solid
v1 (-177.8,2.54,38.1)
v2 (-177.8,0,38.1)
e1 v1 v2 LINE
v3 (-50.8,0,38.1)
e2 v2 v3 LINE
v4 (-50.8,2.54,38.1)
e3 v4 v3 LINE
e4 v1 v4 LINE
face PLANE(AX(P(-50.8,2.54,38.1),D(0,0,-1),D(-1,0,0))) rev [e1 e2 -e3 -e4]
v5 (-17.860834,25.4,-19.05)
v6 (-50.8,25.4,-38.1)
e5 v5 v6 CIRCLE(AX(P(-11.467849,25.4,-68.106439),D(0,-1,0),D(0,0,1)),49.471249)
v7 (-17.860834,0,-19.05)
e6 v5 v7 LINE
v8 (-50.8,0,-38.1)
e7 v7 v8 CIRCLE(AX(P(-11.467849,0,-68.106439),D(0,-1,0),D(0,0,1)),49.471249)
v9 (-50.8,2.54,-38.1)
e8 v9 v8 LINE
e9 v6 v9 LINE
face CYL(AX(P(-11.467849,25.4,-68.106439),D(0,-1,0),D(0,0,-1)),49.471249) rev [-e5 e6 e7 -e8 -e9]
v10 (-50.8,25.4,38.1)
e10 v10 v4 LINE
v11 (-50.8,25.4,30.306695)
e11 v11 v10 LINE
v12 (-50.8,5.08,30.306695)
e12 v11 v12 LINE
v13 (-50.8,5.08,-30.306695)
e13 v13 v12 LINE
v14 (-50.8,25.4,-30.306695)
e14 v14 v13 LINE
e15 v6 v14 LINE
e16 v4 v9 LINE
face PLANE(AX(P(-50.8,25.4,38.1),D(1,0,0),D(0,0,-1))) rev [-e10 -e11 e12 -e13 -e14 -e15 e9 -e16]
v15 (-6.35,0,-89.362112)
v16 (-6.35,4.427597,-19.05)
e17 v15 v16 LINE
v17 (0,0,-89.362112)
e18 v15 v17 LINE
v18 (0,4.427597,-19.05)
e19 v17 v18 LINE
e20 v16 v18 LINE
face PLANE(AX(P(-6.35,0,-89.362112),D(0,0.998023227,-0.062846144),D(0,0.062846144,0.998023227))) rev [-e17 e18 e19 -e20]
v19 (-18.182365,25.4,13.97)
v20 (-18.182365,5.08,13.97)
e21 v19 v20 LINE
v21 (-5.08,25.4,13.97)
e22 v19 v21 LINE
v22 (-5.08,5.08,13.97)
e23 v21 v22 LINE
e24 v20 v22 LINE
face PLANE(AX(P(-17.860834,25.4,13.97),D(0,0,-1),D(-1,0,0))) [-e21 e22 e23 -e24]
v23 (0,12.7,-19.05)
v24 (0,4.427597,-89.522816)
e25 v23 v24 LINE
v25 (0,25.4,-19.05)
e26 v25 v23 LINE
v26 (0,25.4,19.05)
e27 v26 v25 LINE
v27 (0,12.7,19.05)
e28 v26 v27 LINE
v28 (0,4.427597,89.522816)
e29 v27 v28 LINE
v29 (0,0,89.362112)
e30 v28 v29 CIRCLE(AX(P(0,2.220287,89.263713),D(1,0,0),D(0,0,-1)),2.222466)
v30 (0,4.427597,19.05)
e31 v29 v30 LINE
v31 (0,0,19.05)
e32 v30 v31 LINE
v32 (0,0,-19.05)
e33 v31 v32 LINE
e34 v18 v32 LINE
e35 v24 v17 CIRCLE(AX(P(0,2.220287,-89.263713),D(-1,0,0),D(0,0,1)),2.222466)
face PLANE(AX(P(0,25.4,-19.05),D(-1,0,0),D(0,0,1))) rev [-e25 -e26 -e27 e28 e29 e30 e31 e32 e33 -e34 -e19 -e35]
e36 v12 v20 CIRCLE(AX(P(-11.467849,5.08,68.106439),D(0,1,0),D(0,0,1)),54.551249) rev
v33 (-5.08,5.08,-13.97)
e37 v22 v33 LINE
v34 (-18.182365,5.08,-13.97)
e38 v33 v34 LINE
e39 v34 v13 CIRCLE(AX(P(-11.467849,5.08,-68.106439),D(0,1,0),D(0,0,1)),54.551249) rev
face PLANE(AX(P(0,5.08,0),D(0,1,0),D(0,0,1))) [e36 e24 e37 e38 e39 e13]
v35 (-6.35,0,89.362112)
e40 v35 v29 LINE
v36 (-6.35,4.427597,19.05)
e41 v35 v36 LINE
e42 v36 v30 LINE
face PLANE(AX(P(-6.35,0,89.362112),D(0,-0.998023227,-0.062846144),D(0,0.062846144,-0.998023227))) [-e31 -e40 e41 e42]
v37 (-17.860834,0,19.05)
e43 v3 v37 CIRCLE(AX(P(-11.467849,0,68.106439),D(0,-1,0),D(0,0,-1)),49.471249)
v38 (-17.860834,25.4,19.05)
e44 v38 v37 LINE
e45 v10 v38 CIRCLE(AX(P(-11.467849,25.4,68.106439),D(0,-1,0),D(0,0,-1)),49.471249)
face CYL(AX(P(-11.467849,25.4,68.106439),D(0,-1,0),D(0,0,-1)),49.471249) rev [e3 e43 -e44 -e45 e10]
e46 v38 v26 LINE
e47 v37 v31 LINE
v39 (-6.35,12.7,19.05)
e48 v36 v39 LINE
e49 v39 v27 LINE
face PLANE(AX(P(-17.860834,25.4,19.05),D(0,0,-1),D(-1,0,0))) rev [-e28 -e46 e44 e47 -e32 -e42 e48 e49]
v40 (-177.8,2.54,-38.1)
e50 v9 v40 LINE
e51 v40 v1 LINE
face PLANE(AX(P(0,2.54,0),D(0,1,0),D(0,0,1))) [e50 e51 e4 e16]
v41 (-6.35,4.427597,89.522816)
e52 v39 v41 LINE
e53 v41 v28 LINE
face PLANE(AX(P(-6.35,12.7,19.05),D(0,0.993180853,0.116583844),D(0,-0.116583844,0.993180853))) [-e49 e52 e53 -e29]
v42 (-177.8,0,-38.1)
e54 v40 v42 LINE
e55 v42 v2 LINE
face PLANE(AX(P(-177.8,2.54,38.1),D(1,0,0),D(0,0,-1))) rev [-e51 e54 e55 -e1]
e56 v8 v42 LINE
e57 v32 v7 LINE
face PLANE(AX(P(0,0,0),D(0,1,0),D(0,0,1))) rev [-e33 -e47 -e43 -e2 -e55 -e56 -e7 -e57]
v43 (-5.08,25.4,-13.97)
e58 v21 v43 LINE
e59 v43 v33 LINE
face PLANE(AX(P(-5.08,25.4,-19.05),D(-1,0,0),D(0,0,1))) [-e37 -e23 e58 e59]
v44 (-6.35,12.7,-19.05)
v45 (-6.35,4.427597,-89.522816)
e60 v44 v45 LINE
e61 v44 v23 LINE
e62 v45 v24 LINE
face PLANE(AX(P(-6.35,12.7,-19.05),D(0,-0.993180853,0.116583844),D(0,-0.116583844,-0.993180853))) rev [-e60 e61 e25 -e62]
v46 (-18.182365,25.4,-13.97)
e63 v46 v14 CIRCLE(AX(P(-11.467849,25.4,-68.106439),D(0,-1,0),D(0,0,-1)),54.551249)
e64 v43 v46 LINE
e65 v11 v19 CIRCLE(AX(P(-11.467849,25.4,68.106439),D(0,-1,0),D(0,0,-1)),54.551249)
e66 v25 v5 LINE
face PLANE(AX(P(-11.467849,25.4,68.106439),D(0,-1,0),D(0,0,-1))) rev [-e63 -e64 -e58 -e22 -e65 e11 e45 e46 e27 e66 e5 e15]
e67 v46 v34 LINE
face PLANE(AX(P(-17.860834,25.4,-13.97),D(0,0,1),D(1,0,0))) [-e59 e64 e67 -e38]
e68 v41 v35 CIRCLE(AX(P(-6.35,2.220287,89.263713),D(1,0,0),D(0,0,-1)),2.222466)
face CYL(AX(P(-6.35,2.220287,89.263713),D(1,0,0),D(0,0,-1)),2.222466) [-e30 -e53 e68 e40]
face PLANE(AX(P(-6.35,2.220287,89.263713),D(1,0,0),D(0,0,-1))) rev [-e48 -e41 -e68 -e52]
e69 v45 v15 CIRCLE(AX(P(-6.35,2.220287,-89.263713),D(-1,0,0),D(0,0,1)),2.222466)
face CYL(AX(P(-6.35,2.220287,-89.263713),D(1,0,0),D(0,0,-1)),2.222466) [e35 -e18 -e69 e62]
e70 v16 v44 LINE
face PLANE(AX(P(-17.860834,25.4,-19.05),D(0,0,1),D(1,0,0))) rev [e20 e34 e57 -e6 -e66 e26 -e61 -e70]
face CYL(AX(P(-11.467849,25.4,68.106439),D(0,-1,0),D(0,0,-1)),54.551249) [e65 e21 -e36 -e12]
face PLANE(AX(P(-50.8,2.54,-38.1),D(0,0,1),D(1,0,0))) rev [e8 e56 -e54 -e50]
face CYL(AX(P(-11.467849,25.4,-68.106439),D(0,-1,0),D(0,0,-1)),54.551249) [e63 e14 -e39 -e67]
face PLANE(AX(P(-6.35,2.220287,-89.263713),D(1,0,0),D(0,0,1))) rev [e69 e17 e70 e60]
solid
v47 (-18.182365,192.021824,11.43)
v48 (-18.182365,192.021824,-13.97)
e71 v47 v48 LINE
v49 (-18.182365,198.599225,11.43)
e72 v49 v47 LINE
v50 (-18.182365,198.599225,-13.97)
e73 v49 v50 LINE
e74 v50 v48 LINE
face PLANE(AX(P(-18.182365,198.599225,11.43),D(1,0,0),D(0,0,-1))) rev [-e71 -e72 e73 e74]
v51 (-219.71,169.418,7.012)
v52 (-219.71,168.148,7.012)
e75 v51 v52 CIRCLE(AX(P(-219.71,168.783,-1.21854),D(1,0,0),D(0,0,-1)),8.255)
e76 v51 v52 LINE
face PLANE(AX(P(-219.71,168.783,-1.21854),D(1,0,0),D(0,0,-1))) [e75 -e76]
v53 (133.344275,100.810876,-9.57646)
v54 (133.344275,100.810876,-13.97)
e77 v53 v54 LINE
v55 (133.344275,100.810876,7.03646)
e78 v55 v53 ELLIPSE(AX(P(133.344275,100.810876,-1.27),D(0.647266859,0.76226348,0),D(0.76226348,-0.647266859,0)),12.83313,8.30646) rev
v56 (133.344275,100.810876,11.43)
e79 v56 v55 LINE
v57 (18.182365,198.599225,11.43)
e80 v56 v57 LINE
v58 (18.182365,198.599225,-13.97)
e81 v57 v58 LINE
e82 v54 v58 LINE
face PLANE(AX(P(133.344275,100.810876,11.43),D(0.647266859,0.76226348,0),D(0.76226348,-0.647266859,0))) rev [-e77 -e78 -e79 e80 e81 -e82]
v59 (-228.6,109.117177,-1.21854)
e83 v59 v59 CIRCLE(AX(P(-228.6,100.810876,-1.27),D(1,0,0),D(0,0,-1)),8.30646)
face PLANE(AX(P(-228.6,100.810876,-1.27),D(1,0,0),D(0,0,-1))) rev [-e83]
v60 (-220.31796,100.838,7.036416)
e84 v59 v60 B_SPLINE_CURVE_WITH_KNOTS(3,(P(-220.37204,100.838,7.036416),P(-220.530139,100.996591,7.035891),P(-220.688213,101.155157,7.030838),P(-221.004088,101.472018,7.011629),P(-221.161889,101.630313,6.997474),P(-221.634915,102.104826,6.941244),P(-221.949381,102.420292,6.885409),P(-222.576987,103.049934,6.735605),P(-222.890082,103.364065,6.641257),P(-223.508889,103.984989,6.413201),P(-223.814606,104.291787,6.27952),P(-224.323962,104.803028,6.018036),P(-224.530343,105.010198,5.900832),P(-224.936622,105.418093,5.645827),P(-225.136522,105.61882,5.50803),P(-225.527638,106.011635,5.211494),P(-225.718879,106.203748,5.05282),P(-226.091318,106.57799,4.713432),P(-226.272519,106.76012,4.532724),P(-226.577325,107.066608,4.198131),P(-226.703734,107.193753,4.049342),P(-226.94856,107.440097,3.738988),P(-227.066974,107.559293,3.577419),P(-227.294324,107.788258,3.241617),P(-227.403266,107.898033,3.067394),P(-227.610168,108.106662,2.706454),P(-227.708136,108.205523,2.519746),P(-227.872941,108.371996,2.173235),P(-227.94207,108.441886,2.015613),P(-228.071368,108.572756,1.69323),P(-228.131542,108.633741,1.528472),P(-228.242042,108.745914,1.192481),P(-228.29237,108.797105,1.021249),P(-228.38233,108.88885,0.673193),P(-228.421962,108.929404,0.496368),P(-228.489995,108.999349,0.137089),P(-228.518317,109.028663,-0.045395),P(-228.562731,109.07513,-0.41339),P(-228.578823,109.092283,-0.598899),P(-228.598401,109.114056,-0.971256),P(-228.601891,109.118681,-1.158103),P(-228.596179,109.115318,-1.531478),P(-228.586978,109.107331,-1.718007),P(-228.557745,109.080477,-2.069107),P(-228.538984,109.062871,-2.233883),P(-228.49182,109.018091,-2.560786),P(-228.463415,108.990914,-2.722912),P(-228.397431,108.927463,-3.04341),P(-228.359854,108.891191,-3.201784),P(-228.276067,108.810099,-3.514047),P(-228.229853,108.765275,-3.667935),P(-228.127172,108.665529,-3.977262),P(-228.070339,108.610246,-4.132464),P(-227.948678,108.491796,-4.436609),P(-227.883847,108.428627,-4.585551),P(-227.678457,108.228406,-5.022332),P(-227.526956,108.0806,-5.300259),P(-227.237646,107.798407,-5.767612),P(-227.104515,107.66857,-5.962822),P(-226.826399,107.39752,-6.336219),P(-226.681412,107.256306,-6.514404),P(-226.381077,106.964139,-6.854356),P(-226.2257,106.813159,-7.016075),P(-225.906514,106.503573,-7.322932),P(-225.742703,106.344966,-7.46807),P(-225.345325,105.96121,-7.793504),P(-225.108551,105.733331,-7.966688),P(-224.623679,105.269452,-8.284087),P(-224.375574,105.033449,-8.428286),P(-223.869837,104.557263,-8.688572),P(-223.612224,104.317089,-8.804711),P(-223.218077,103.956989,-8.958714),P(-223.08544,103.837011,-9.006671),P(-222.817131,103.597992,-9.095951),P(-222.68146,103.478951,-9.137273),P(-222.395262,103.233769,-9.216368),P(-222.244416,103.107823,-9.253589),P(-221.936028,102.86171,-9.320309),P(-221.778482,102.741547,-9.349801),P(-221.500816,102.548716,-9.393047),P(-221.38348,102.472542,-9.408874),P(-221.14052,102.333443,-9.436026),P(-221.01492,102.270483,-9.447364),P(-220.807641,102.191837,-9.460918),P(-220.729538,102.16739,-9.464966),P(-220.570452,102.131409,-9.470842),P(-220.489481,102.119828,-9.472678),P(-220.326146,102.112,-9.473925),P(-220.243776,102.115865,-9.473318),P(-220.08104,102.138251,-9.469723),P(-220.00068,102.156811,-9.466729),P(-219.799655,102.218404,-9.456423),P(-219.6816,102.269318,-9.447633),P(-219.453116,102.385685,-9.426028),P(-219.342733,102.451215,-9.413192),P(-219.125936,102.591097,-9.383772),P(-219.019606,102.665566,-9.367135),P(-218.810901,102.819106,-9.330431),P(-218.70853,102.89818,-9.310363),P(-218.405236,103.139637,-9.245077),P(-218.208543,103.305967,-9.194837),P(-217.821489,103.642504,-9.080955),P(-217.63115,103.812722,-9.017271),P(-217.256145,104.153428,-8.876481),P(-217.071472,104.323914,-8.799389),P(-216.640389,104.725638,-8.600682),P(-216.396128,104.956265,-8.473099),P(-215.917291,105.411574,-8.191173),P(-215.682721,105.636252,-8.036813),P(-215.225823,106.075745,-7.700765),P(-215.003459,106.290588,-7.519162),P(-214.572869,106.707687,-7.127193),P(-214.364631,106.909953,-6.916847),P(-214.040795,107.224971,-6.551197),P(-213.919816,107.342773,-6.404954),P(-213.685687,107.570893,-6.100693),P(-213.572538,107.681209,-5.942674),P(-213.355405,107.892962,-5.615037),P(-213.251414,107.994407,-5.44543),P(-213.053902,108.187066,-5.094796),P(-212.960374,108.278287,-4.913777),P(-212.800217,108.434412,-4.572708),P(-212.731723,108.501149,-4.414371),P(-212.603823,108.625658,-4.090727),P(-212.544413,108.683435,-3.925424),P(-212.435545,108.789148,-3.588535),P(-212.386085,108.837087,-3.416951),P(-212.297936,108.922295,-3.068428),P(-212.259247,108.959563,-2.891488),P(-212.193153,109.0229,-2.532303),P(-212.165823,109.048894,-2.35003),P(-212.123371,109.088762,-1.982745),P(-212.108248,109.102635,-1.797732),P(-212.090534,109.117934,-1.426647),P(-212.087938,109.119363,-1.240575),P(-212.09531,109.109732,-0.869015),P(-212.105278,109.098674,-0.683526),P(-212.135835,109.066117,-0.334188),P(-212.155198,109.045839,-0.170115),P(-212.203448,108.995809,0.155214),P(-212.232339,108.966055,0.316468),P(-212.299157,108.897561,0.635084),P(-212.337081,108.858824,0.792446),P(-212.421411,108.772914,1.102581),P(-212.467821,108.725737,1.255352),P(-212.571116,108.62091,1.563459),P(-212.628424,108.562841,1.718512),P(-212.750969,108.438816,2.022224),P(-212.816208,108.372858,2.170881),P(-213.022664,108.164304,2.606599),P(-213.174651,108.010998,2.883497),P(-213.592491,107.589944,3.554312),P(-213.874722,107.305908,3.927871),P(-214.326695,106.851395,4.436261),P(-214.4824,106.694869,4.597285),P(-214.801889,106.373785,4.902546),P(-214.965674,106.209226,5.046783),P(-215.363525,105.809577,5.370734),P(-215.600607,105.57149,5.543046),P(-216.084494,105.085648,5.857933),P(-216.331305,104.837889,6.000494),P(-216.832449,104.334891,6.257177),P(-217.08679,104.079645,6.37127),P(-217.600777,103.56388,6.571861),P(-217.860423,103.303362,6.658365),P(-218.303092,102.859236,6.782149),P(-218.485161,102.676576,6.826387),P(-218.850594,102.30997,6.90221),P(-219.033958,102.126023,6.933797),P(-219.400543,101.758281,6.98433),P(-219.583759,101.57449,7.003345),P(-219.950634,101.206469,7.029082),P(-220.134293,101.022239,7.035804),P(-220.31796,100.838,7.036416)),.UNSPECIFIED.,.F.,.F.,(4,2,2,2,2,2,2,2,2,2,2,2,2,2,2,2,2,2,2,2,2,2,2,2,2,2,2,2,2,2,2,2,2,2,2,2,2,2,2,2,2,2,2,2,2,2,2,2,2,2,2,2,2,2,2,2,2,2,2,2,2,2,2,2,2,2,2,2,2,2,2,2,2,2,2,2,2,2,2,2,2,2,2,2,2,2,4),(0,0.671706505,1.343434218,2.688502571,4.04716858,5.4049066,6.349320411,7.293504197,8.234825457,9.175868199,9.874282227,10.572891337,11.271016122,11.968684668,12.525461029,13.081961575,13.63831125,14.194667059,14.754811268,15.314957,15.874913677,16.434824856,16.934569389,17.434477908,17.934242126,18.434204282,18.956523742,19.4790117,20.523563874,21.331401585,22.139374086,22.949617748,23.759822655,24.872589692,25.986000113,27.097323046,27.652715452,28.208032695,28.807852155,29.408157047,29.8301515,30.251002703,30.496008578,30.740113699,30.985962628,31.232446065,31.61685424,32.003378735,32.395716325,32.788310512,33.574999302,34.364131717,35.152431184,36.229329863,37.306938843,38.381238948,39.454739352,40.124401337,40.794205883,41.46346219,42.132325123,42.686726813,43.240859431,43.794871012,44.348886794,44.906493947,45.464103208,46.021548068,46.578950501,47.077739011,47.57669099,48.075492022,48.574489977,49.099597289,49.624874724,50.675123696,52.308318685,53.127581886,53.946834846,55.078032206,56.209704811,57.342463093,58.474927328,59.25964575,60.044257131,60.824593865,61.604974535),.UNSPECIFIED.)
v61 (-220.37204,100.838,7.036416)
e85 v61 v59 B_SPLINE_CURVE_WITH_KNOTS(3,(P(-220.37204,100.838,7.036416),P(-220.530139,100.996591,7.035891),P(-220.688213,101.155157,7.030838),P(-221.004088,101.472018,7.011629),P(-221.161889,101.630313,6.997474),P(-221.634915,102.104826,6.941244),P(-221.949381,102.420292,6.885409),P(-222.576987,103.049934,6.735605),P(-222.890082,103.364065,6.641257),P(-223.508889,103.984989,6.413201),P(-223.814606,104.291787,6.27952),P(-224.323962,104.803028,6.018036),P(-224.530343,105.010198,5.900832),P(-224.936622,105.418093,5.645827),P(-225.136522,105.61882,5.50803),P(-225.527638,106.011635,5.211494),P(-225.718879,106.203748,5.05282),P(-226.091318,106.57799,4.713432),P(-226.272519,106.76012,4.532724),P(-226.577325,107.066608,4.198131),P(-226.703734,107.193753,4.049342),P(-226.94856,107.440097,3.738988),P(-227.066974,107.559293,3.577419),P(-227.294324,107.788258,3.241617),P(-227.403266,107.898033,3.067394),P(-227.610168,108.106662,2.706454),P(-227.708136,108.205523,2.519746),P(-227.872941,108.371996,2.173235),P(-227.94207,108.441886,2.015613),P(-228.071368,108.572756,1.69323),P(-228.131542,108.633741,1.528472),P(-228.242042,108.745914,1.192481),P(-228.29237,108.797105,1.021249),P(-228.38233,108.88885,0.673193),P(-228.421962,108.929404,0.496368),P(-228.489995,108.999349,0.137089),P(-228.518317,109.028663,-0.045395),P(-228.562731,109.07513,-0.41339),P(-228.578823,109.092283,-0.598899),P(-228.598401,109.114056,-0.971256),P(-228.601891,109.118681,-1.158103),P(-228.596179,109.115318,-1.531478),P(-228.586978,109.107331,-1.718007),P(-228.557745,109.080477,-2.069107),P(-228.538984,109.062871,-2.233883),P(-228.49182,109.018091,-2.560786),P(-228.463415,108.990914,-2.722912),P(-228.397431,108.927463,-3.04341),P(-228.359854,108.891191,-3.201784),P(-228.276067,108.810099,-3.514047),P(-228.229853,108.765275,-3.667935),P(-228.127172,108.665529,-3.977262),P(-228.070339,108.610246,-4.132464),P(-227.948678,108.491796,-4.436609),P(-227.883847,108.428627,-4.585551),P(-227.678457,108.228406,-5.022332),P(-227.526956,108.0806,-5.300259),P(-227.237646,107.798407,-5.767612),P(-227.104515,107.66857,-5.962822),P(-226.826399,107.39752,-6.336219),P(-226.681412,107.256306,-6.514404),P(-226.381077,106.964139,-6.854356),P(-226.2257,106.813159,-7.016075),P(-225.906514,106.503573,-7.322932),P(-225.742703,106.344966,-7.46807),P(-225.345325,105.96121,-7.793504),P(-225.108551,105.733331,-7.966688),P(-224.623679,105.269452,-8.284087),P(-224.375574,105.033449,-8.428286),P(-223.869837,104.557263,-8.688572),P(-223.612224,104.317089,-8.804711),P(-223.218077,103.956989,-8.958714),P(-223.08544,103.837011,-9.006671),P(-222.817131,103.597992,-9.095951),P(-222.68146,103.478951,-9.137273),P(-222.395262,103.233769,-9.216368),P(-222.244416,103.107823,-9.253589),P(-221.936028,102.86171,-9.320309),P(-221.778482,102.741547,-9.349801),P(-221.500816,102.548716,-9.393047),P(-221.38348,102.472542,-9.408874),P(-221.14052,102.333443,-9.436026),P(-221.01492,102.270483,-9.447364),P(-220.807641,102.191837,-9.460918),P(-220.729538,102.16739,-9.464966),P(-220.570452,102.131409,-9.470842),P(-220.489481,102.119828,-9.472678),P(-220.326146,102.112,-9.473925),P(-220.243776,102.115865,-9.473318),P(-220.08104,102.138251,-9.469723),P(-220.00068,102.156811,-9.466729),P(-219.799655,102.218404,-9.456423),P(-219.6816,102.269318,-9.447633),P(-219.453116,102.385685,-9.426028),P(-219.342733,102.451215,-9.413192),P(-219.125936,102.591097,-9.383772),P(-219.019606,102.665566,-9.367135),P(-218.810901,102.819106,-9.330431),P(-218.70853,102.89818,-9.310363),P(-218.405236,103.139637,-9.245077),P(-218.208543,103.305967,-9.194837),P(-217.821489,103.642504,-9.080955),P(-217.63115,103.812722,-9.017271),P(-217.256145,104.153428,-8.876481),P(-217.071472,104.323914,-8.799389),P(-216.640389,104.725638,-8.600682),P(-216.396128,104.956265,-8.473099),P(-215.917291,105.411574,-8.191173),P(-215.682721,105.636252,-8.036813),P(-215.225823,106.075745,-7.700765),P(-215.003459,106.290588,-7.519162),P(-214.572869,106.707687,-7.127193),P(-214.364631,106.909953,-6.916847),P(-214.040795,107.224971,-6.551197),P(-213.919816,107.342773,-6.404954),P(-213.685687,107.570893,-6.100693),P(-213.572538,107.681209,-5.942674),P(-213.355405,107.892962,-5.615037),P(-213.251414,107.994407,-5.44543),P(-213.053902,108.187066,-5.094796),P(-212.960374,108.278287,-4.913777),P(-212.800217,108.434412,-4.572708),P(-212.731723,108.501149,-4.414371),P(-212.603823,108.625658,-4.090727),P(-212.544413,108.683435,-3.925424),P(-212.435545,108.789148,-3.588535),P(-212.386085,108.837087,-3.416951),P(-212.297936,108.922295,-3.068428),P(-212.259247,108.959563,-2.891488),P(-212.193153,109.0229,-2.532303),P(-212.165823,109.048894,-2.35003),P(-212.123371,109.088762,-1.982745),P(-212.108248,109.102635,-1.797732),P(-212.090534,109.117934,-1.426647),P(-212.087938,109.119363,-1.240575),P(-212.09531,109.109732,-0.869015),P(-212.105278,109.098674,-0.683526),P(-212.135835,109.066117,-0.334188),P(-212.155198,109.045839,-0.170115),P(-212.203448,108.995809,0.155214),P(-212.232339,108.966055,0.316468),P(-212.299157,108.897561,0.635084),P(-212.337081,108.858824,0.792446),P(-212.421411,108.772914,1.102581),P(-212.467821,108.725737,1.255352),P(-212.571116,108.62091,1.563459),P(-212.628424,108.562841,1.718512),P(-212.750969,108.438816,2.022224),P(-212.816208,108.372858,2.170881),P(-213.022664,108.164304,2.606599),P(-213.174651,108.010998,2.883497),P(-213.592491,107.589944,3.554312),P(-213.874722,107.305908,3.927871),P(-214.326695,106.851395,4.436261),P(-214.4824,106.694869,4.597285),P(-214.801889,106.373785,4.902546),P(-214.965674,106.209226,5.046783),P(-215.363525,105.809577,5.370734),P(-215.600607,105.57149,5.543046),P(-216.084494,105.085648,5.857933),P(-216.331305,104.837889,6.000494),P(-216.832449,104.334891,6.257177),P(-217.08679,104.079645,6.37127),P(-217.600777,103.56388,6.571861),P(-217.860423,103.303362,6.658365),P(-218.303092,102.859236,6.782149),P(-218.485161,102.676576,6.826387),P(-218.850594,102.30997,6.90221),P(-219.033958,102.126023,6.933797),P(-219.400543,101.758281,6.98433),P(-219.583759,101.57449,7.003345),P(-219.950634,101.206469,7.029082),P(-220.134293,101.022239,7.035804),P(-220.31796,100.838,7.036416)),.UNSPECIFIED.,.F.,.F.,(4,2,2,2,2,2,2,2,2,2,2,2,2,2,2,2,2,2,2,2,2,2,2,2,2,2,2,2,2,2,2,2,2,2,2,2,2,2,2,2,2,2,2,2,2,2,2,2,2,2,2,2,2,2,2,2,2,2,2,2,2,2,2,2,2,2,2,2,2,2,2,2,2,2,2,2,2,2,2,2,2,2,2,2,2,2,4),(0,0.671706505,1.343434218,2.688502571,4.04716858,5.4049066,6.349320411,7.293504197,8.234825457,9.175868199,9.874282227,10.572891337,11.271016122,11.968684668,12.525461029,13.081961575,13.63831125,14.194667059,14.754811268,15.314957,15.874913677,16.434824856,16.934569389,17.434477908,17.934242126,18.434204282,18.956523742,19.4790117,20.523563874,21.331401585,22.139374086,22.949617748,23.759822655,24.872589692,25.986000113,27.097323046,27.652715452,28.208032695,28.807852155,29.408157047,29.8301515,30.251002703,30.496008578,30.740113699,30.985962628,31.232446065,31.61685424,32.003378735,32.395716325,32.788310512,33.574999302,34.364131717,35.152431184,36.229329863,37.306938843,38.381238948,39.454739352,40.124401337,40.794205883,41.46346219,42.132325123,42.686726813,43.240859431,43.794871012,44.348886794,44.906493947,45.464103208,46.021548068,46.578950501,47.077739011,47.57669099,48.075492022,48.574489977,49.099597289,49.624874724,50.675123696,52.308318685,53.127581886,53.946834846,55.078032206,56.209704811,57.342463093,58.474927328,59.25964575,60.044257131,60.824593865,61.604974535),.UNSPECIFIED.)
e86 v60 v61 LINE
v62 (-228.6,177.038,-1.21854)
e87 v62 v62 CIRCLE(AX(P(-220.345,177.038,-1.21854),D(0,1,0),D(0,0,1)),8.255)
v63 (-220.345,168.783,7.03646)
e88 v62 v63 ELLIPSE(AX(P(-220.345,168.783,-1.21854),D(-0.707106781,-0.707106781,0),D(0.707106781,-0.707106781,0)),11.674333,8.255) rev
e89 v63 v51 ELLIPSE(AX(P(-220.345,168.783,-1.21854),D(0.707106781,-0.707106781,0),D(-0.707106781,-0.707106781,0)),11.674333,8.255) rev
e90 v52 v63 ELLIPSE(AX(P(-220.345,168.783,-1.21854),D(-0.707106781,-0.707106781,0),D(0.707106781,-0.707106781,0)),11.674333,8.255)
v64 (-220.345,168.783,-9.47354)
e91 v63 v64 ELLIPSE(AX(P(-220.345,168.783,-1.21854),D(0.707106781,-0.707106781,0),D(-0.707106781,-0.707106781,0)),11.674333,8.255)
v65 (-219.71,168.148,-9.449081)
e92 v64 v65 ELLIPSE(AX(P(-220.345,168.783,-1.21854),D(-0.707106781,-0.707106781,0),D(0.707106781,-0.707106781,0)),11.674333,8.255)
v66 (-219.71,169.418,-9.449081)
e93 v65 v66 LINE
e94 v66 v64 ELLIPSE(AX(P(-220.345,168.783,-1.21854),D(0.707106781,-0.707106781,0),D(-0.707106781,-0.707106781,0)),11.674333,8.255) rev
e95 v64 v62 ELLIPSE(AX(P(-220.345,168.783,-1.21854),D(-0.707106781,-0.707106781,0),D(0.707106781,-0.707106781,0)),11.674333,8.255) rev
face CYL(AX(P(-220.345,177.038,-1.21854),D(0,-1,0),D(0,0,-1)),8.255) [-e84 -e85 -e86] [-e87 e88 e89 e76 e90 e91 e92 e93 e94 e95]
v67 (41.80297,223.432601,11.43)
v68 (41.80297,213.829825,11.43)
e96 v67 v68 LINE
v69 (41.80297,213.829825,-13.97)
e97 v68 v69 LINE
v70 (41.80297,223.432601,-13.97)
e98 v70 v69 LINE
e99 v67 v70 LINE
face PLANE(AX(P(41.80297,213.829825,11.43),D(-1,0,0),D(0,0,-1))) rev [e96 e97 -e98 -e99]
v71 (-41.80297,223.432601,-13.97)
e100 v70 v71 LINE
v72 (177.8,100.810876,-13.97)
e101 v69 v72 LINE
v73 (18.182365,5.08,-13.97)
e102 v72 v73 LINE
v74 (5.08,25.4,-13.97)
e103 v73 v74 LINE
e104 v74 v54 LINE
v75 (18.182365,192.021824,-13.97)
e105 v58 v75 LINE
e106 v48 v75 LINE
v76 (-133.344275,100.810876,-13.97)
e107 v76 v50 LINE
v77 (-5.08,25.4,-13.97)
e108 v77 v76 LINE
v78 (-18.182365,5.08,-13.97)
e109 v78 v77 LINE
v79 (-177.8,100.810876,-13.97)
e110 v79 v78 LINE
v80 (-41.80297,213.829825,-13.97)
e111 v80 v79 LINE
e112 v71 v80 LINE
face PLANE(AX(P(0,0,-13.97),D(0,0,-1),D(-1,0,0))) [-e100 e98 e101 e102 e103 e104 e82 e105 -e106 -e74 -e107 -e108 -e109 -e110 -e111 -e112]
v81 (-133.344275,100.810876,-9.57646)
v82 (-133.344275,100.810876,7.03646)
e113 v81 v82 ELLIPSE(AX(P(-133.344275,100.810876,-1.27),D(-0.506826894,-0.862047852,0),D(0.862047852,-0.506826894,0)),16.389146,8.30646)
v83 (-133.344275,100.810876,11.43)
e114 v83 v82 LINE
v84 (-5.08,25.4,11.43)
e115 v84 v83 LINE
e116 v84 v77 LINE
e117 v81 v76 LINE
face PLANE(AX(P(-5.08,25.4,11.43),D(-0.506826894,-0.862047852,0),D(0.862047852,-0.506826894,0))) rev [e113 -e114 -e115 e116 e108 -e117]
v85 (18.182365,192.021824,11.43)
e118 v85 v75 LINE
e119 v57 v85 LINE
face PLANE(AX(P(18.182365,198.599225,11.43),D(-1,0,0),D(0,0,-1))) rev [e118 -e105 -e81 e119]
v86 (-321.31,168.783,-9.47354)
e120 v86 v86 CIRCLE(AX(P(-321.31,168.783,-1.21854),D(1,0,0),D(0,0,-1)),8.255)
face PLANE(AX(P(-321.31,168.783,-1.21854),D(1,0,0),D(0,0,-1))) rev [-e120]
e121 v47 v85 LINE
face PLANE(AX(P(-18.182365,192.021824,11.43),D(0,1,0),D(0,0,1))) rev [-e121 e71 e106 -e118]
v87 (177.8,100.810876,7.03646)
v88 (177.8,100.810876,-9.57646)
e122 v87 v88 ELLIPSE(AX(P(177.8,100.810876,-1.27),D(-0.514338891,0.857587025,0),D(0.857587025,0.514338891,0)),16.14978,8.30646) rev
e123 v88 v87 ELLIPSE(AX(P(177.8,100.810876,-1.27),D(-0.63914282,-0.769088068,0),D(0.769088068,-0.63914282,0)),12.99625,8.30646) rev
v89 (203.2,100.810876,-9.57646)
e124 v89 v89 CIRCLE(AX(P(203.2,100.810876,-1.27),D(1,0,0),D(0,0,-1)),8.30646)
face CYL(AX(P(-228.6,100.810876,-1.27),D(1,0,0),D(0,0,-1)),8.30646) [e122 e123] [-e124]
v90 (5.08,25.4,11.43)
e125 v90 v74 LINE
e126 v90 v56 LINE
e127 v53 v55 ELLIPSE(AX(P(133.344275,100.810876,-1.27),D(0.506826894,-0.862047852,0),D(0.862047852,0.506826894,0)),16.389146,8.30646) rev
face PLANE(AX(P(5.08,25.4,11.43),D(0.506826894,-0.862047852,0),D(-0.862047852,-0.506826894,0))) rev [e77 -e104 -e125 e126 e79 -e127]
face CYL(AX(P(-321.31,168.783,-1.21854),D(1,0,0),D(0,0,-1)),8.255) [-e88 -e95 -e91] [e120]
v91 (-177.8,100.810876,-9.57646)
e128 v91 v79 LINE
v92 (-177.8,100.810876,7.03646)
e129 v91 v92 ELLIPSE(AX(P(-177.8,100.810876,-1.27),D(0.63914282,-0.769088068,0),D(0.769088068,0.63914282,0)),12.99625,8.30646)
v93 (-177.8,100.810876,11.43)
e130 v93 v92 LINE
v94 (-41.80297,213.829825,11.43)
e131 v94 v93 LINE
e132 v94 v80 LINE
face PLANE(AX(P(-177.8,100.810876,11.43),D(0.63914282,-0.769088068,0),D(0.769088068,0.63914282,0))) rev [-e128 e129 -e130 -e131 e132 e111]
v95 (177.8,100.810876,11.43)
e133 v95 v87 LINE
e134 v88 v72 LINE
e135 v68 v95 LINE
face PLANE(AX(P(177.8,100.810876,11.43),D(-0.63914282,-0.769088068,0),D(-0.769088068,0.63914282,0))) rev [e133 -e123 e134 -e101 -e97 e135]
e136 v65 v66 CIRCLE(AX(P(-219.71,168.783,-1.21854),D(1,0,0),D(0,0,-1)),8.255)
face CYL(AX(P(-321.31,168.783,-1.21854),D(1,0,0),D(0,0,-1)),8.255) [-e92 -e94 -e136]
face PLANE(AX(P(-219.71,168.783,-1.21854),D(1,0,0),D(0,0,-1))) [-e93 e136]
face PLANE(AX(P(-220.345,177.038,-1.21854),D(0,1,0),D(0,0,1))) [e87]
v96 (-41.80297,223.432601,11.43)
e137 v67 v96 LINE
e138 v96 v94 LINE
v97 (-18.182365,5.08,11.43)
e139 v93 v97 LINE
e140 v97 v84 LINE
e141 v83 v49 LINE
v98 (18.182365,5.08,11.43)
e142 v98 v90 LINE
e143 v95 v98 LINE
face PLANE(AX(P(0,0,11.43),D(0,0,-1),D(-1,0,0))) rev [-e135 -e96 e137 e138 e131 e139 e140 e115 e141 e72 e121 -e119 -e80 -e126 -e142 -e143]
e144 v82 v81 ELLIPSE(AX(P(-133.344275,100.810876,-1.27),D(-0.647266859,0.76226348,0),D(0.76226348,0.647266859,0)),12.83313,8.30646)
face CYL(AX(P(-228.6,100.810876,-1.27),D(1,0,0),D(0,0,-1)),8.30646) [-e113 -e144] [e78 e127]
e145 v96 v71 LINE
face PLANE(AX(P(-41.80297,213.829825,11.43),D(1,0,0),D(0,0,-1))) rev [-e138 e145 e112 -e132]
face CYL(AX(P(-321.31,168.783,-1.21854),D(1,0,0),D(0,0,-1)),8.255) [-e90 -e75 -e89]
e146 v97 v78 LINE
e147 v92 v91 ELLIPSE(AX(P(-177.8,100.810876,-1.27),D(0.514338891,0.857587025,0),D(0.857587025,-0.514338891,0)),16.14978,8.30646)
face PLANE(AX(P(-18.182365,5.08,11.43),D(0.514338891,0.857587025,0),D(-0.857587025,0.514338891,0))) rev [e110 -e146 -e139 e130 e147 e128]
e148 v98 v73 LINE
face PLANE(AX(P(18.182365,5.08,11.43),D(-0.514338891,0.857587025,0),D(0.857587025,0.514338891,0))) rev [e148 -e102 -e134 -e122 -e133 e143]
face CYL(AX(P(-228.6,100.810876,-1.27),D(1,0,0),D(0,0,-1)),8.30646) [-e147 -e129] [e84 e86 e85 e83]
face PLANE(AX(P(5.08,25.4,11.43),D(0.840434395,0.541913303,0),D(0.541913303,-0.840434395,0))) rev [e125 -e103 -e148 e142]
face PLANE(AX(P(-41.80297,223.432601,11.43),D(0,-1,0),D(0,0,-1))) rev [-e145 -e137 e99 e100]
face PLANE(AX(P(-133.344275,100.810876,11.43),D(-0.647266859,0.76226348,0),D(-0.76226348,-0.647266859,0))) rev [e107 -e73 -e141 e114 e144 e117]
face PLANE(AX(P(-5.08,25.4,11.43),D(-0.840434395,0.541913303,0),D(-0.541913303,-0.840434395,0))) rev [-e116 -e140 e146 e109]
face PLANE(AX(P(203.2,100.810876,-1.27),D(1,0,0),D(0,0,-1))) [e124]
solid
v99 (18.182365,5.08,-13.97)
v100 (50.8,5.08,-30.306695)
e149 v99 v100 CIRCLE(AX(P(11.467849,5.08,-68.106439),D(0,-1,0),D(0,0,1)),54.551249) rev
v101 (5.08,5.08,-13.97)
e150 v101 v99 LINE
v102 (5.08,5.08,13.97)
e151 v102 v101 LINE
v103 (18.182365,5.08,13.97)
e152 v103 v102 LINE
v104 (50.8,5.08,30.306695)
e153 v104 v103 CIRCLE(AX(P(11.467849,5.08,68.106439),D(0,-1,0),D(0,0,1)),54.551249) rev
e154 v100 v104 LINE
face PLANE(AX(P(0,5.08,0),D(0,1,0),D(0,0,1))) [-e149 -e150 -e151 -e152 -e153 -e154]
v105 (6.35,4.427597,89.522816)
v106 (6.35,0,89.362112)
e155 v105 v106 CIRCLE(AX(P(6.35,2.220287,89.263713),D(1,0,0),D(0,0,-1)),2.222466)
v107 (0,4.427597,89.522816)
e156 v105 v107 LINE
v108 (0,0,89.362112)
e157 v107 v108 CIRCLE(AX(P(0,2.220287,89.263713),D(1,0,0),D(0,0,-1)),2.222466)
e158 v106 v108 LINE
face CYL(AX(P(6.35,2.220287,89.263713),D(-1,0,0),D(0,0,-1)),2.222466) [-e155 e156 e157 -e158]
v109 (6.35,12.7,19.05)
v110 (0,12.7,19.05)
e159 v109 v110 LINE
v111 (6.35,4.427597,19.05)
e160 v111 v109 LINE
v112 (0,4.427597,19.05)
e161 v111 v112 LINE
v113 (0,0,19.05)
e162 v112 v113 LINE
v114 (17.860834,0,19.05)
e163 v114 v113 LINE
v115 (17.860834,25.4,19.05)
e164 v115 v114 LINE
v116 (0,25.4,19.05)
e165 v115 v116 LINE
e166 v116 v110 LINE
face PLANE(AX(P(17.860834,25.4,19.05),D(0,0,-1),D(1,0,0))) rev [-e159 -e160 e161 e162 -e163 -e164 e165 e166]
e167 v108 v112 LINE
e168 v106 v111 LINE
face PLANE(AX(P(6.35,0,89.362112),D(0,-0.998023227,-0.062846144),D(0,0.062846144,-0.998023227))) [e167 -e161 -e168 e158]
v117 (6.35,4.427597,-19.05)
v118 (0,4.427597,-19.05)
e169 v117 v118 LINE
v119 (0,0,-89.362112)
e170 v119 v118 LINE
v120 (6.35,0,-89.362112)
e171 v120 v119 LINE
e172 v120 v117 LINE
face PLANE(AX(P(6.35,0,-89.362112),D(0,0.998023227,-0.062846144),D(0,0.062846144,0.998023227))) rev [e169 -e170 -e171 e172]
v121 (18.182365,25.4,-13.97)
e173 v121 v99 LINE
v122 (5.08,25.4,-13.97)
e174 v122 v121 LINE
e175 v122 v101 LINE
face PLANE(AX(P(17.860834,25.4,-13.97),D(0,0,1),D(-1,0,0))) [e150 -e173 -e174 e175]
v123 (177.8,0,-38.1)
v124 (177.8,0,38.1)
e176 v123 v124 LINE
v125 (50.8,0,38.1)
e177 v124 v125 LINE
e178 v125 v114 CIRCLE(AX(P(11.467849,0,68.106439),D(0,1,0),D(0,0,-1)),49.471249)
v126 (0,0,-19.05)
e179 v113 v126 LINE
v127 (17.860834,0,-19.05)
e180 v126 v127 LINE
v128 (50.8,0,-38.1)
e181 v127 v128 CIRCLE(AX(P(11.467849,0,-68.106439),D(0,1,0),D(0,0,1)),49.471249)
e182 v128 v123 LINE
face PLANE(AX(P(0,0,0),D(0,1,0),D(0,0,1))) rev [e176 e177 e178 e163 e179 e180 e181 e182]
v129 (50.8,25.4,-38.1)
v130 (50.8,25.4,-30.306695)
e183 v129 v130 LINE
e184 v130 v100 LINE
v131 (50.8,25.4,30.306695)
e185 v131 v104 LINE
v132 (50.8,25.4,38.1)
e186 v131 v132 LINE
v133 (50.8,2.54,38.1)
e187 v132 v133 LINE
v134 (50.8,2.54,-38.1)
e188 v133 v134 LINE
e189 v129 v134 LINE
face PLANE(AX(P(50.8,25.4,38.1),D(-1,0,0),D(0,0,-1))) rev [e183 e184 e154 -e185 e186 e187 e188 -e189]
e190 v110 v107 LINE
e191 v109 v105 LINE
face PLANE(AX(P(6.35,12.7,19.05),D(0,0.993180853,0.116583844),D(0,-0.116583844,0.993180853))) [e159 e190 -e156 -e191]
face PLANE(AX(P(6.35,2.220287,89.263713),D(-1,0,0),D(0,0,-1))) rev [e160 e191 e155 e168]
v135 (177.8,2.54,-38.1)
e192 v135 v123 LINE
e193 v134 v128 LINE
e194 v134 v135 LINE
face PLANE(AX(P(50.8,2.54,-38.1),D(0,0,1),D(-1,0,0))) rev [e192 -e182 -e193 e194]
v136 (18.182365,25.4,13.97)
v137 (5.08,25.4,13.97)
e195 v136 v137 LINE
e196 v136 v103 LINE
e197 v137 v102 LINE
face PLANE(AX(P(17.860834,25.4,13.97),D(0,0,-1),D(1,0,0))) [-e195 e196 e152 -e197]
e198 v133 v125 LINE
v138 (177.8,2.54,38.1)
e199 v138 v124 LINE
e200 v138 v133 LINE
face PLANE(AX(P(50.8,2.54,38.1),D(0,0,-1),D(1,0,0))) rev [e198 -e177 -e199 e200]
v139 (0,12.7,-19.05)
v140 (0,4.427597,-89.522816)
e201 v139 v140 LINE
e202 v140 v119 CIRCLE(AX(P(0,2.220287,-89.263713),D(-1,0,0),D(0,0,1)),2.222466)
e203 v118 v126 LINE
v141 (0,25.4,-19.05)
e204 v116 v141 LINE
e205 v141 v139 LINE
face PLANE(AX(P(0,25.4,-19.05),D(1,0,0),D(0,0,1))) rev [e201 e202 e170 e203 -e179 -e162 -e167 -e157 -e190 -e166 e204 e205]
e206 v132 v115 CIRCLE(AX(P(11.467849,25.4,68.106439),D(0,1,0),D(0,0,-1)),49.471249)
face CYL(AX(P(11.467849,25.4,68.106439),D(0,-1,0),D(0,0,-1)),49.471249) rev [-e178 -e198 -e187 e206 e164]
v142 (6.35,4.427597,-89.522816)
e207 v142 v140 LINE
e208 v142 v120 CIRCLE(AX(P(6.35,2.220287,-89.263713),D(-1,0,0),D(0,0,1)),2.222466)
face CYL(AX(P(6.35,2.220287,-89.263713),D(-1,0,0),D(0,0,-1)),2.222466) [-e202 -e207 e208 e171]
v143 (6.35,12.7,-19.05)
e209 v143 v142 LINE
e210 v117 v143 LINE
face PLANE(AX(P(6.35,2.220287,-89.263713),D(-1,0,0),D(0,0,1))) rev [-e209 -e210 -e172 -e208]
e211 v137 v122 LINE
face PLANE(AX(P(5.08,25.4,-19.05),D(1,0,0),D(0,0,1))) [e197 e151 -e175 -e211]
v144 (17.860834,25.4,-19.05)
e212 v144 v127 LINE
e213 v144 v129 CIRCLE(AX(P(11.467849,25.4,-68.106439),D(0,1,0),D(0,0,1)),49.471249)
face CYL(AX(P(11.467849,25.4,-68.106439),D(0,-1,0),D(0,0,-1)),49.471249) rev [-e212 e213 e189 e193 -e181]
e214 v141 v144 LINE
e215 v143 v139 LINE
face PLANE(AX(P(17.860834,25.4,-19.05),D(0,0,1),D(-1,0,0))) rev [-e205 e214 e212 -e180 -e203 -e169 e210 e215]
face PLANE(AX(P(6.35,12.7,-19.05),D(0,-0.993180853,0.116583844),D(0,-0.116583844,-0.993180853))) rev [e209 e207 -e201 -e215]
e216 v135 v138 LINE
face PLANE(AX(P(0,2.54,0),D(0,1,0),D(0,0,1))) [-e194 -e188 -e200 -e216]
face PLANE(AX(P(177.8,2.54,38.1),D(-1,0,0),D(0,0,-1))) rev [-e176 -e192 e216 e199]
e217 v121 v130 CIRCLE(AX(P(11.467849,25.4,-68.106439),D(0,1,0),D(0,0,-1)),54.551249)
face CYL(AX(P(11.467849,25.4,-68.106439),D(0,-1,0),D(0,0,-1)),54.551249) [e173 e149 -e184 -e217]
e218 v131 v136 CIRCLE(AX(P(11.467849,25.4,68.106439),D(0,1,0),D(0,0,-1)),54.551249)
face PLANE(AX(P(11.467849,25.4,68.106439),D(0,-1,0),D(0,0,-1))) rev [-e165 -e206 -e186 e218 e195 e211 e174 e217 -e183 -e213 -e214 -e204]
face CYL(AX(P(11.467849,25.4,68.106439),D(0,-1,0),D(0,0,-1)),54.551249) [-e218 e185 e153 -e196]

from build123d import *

# Parameters (mm, degrees)
SKETCH2_W                 = 127
SKETCH2_H                 = 76.2
BOSS_EXTRUDE1_DEPTH       = 2.54
BOSS_EXTRUDE2_DEPTH       = 25.4
SHELL1_START              = 5.08
SHELL1_DEPTH              = 20.32
BOSS_EXTRUDE10_DEPTH      = 25.4
BOSS_EXTRUDE11_DEPTH      = 6.35
BOSS_EXTRUDE12_DEPTH      = 203.2
BOSS_EXTRUDE12_DEPTH_BACK = 228.6
SKETCH9_R                 = 8.30646
SKETCH10_R                = 8.255
BOSS_EXTRUDE13_DEPTH      = 76.2
SKETCH11_R                = 8.255
BOSS_EXTRUDE14_DEPTH      = 101.6


# Read off the part's stored shape, not the designer's step: Shell1
with BuildPart() as part:
    # Sketch2 → Boss-Extrude1 (new body)
    with BuildSketch(Plane(origin=(0, 0, 0), x_dir=(1, 0, 0), z_dir=(0, 1, 0))):
        with Locations((-114.3, 0)):
            Rectangle(SKETCH2_W, SKETCH2_H)
    extrude(amount=BOSS_EXTRUDE1_DEPTH)

    # Sketch6 → Boss-Extrude2 (add)
    with BuildSketch(Plane(origin=(0, 0, 0), x_dir=(1, 0, 0), z_dir=(0, 1, 0))):
        with BuildLine():
            Line((-17.860834, -19.05), (0, -19.05))
            Line((0, -19.05), (0, 19.05))
            Line((0, 19.05), (-17.860834, 19.05))
            ThreePointArc((-17.860834, 19.05), (-36.23522, 25.281425), (-50.8, 38.1))
            Line((-50.8, 38.1), (-50.8, -38.1))
            ThreePointArc((-50.8, -38.1), (-36.23522, -25.281425), (-17.860834, -19.05))
        make_face()
    extrude(amount=BOSS_EXTRUDE2_DEPTH)

    # Shell1 outline → Shell1 (cut)
    with BuildSketch(Plane(origin=(0, 0, 0), x_dir=(1, 0, 0), z_dir=(0, 1, 0)).offset(SHELL1_START)):
        with BuildLine():
            Line((-50.8, 30.306695), (-50.8, -30.306695))
            ThreePointArc((-50.8, -30.306695), (-35.897253, -19.331005), (-18.182365, -13.97))
            Line((-18.182365, -13.97), (-5.08, -13.97))
            Line((-5.08, -13.97), (-5.08, 13.97))
            Line((-5.08, 13.97), (-18.182365, 13.97))
            ThreePointArc((-18.182365, 13.97), (-35.897253, 19.331005), (-50.8, 30.306695))
        make_face()
    extrude(amount=SHELL1_DEPTH, mode=Mode.SUBTRACT)

    # Sketch8 → Boss-Extrude11 (add)
    with BuildSketch(Plane(origin=(0, 0, 0), x_dir=(0, 0, -1), z_dir=(1, 0, 0))):
        with BuildLine():
            Line((-19.05, 12.7), (-89.522816, 4.427597))
            ThreePointArc((-89.522816, 4.427597), (-91.484716, 2.139673), (-89.362112, 0))
            Line((-89.362112, 0), (-19.05, 4.427597))
            Line((-19.05, 4.427597), (-19.05, 12.7))
        make_face()
    boss_extrude11 = extrude(amount=-BOSS_EXTRUDE11_DEPTH)

    # Mirror2: Boss-Extrude11 across plane
    add(boss_extrude11.mirror(Plane.XY))


with BuildPart() as body_2:
    # Sketch7 → Boss-Extrude10 (new body)
    with BuildSketch(Plane.XY.offset(-13.97)):
        Polygon((-5.08, 25.4), (-133.344275, 100.810876), (-18.182365, 198.599225), (-18.182365, 192.021824), (0, 192.021824), (0, 223.432601), (-41.80297, 223.432601), (-41.80297, 213.829825), (-177.8, 100.810876), (-18.182365, 5.08), align=None)
    extrude(amount=BOSS_EXTRUDE10_DEPTH)


with BuildPart() as body_3:
    # Mirror3: mirrored copy
    add(body_2.part.mirror(Plane(origin=(0, 0, 0), x_dir=(0, 0, 1), z_dir=(1, 0, 0))))


with BuildPart() as body_4:
    # Mirror3 2: mirrored copy
    add(part.part.mirror(Plane(origin=(0, 0, 0), x_dir=(0, 0, 1), z_dir=(1, 0, 0))))


with BuildPart() as body_2_1:
    add(body_2.part)

    add(body_3.part)  # Boss-Extrude12 merges body 3
    # Sketch9 → Boss-Extrude12 (add, two sides: drawn at the far end of the back side and taken through both)
    with BuildSketch(Plane(origin=(0, 0, 0), x_dir=(0, 0, -1), z_dir=(1, 0, 0)).offset(-BOSS_EXTRUDE12_DEPTH_BACK)):
        with Locations((1.27, 100.810876)):
            Circle(SKETCH9_R)
    extrude(amount=BOSS_EXTRUDE12_DEPTH + BOSS_EXTRUDE12_DEPTH_BACK)

    # Sketch10 → Boss-Extrude13 (add)
    with BuildSketch(Plane(origin=(0, 100.838, 0), x_dir=(1, 0, 0), z_dir=(0, 1, 0))):
        with Locations(Location((-220.345, 1.21854, 0), (0, 0, 180))):
            Circle(SKETCH10_R)
    extrude(amount=BOSS_EXTRUDE13_DEPTH)

    # Sketch11 → Boss-Extrude14 (add)
    with BuildSketch(Plane(origin=(-219.71, 0, 0), x_dir=(0, 0, -1), z_dir=(1, 0, 0))):
        with Locations((1.21854, 168.783)):
            Circle(SKETCH11_R)
    extrude(amount=-BOSS_EXTRUDE14_DEPTH)


solid = Compound([part.part, body_4.part, body_2_1.part])
